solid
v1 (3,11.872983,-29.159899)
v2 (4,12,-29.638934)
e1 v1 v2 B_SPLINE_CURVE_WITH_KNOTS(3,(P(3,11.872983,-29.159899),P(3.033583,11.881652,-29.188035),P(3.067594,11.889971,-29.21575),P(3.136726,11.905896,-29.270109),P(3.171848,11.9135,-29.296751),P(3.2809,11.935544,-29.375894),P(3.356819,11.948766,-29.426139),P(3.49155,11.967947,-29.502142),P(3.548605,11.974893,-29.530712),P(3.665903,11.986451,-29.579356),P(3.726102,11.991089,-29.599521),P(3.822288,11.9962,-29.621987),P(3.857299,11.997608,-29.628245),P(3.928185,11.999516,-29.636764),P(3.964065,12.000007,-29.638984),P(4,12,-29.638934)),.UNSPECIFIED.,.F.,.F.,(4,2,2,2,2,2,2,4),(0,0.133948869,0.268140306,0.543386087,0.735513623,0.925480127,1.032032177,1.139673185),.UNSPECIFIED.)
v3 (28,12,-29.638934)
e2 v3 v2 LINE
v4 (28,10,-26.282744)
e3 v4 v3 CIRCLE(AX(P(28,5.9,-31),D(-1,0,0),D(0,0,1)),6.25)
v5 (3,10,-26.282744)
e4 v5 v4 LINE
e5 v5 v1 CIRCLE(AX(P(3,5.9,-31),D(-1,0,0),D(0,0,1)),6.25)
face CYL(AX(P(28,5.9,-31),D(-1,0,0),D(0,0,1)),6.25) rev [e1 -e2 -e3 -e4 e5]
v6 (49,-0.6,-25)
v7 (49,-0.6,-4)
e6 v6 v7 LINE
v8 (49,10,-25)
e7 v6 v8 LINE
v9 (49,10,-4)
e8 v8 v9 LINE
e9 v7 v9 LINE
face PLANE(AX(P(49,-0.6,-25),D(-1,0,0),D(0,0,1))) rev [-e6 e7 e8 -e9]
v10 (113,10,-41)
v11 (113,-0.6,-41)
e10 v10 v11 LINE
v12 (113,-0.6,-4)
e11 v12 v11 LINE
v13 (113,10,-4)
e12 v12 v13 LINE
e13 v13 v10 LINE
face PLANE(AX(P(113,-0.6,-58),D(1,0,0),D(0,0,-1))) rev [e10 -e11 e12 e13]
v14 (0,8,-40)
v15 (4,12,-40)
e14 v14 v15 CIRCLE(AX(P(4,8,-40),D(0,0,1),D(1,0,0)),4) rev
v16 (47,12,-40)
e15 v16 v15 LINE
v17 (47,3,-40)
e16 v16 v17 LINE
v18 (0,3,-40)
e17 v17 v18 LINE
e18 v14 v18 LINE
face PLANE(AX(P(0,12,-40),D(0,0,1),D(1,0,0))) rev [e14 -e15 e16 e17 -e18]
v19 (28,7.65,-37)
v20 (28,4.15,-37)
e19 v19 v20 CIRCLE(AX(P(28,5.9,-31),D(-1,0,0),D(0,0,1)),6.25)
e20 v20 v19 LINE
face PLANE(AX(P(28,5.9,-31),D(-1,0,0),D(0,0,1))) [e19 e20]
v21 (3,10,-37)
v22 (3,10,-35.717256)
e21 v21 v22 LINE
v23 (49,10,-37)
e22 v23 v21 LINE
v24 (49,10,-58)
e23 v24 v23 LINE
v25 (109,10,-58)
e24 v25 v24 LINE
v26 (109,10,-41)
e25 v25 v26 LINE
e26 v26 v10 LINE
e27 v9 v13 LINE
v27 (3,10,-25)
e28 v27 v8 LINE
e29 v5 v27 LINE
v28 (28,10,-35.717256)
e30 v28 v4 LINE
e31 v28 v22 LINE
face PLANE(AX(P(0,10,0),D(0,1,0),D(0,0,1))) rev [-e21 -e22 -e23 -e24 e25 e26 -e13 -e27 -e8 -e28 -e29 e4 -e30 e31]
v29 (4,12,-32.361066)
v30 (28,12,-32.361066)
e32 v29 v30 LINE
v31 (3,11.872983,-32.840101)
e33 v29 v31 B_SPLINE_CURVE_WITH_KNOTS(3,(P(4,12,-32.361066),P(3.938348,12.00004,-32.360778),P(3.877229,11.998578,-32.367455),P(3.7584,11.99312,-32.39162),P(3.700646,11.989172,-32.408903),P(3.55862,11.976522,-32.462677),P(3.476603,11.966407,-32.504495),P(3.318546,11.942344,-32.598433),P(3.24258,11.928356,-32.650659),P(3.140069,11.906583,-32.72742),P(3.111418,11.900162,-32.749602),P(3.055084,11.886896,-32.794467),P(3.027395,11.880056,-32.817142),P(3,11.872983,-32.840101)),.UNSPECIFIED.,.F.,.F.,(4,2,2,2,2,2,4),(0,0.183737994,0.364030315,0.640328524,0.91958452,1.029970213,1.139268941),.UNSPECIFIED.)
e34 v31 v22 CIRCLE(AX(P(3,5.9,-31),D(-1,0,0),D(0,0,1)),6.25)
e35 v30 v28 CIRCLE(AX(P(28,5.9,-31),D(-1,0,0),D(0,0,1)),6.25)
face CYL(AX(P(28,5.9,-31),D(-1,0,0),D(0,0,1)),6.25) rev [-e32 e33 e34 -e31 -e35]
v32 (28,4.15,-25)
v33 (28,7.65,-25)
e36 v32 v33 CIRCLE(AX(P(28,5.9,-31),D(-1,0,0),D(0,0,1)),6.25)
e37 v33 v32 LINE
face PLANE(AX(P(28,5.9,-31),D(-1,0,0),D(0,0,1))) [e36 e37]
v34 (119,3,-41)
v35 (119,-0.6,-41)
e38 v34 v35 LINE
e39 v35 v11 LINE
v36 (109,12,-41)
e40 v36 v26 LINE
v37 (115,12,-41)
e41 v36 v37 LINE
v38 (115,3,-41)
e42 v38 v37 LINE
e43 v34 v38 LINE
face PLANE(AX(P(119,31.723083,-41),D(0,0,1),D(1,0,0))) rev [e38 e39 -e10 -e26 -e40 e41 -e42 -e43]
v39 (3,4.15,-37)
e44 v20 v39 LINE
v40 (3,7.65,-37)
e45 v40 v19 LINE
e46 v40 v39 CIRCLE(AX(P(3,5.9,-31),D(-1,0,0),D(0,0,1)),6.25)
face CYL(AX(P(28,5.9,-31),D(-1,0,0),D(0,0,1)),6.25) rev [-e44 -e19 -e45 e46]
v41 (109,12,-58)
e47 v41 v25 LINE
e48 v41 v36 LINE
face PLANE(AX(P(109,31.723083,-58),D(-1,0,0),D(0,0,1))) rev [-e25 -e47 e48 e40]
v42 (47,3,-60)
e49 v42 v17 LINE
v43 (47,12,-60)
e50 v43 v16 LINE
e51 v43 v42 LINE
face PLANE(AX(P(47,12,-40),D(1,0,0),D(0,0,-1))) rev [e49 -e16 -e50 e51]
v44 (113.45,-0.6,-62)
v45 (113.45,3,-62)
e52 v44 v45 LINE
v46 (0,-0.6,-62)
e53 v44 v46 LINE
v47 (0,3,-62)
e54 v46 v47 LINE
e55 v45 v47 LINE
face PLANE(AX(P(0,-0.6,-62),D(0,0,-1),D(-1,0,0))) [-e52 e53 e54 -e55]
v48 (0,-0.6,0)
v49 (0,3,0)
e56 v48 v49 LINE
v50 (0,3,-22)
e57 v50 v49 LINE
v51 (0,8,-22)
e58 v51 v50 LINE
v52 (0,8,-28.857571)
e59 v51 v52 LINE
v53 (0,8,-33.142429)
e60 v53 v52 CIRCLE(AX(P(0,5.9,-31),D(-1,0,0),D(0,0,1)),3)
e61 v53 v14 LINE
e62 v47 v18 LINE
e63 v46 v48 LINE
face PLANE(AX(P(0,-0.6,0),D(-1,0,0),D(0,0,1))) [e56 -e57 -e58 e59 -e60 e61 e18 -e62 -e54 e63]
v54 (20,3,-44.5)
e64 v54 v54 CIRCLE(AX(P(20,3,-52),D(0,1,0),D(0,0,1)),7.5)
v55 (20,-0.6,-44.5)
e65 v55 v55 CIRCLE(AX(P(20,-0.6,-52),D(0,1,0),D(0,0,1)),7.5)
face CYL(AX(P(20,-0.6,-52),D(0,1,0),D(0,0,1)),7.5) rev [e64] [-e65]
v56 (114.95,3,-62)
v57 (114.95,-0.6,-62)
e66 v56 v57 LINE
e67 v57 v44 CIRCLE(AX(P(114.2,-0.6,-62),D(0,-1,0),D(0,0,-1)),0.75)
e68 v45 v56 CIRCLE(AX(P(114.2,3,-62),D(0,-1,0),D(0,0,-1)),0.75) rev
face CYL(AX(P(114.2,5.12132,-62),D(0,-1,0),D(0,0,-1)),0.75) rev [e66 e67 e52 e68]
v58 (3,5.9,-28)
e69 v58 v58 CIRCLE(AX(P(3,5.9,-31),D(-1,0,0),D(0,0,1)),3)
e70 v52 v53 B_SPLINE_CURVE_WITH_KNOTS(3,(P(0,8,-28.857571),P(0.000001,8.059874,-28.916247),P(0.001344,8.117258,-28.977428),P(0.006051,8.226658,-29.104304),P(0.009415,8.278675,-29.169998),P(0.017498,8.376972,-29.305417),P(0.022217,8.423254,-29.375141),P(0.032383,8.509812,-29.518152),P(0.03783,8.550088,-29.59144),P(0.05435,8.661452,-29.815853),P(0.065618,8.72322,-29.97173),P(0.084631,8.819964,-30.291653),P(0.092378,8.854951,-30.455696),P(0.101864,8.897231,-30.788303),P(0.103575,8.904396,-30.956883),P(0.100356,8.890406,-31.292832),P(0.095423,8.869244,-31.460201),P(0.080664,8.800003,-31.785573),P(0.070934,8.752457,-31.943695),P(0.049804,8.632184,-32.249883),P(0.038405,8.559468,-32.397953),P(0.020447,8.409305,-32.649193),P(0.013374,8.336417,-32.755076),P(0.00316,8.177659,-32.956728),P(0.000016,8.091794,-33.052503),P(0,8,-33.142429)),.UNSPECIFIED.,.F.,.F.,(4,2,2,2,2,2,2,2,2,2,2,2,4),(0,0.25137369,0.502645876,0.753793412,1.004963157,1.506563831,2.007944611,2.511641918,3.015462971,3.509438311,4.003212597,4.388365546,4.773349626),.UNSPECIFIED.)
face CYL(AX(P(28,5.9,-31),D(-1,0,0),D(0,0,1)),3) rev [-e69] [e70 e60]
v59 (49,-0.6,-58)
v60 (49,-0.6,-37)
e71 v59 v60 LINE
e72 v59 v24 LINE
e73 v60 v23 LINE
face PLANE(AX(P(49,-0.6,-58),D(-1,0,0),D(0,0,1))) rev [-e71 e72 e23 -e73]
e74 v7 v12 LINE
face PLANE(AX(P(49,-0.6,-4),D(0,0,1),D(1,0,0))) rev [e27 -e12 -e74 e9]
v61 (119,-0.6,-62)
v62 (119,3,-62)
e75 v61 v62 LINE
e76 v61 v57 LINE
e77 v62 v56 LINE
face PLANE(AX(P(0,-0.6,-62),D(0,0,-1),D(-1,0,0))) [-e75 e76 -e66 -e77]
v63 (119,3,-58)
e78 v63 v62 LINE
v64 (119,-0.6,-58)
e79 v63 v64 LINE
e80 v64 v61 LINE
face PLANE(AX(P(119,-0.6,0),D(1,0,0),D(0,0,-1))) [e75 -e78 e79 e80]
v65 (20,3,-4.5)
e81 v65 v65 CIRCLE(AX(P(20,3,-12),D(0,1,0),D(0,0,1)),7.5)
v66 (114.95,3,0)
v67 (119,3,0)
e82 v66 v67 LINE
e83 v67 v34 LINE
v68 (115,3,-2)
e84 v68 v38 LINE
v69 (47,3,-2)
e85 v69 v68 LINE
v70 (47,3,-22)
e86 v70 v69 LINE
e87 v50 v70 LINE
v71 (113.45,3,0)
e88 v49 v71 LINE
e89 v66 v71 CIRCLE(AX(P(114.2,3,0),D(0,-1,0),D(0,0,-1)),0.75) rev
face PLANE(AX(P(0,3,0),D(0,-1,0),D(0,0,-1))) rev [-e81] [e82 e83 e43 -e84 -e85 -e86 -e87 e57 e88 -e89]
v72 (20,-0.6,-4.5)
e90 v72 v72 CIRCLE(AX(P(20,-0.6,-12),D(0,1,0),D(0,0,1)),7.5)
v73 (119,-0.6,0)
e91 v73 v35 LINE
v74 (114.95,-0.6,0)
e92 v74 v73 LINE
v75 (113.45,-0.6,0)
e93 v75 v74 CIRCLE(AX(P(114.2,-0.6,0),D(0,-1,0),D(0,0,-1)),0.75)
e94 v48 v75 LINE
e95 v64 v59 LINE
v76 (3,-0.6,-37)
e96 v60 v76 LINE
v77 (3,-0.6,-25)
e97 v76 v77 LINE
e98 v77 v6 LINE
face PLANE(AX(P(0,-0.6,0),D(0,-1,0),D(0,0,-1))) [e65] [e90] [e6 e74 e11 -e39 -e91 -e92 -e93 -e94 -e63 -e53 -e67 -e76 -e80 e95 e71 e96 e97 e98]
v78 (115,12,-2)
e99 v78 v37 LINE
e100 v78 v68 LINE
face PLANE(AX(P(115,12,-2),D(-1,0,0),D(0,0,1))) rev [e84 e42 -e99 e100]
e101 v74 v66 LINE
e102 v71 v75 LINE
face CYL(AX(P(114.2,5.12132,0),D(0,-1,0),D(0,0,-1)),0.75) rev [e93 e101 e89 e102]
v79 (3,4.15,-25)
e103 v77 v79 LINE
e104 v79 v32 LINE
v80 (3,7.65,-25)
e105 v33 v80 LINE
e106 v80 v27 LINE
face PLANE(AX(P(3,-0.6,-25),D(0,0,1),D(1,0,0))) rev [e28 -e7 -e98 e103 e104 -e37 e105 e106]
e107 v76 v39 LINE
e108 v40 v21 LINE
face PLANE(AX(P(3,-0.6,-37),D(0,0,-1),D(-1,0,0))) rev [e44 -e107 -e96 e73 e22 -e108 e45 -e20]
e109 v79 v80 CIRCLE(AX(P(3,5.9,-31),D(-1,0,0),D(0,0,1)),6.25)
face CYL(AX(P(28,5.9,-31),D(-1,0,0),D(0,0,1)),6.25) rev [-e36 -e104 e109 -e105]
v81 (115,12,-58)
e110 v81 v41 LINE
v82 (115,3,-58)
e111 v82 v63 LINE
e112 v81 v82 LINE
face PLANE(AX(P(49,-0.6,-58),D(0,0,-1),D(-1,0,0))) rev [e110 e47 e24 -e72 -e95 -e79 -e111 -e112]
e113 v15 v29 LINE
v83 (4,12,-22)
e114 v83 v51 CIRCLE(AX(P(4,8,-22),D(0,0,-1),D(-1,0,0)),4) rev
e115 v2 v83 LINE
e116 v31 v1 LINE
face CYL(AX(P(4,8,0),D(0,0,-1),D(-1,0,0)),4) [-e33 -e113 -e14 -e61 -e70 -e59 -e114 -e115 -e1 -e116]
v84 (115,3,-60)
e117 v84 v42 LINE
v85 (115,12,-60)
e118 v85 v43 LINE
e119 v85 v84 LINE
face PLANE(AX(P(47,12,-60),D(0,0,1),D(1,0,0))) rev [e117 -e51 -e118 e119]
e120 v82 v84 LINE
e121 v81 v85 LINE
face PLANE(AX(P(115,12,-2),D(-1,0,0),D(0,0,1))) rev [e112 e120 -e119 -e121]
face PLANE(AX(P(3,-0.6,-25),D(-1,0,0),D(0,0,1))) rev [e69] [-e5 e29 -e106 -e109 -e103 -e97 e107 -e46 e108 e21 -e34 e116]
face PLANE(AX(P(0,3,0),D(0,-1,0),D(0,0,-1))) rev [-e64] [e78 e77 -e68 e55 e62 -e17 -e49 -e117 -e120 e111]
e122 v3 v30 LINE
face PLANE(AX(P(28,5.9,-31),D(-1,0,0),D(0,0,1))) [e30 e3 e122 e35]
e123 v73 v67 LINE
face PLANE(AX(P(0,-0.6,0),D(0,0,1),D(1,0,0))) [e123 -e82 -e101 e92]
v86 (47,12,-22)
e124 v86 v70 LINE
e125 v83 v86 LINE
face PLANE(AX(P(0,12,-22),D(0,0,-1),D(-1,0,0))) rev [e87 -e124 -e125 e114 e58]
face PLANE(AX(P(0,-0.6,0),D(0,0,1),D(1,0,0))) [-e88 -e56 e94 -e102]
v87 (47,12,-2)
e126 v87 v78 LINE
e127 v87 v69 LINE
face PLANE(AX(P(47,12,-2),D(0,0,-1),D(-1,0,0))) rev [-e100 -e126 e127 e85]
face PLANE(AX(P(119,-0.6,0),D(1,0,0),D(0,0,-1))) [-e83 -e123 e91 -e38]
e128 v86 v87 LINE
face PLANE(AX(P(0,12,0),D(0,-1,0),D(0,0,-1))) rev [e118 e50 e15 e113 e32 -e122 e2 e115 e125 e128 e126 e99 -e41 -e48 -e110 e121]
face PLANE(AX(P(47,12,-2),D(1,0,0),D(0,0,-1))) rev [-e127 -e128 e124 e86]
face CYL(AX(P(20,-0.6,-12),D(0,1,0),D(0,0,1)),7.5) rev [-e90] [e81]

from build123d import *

# Parameters (mm, degrees)
RESSALTO_EXTRUS_O1_DEPTH      = 3
RESSALTO_EXTRUS_O1_DEPTH_BACK = 0.6
ESBO_O1_W                     = 119
ESBO_O1_H                     = 62
ESBO_O1_R                     = 7.5
RESSALTO_EXTRUS_O2_DEPTH      = 9
CORTE_EXTRUS_O1_START         = -2
CORTE_EXTRUS_O1_DEPTH         = 133.772994327
ESBO_O4_R                     = 3
CORTE_EXTRUS_O2_DEPTH         = 28
CORTE_EXTRUS_O3_START         = -3
ESBO_O4_4_R                   = 6.25
ESBO_O4_4_R_2                 = 3
CORTE_EXTRUS_O3_DEPTH         = 25
ESBO_O6_R                     = 0.75
CORTE_EXTRUS_O5_DEPTH         = 3.6
CORTE_EXTRUS_O6_REACH         = 136.773
ESBO_O7_W                     = 10
ESBO_O7_H                     = 17
FILETE1_R                     = 4


with BuildPart() as part:
    # Esboço1 → Ressalto-extrusão1 (new, two sides: drawn at the far end of the back side and taken through both)
    with BuildSketch(Plane(origin=(0, 0, 0), x_dir=(1, 0, 0), z_dir=(0, 1, 0)).offset(-RESSALTO_EXTRUS_O1_DEPTH_BACK)):
        with Locations((59.5, 31)):
            Rectangle(ESBO_O1_W, ESBO_O1_H)
        with Locations(Location((20, 52, 0), (0, 0, 270))):
            Circle(ESBO_O1_R, mode=Mode.SUBTRACT)
        with Locations(Location((20, 12, 0), (0, 0, 270))):
            Circle(ESBO_O1_R, mode=Mode.SUBTRACT)
    extrude(amount=RESSALTO_EXTRUS_O1_DEPTH + RESSALTO_EXTRUS_O1_DEPTH_BACK)

    # Esboço2 → Ressalto-extrusão2 (add)
    with BuildSketch(Plane(origin=(0, 3, 0), x_dir=(1, 0, 0), z_dir=(0, 1, 0))):
        Polygon((47, 2), (115, 2), (115, 60), (47, 60), (47, 40), (0, 40), (0, 22), (47, 22), align=None)
    extrude(amount=RESSALTO_EXTRUS_O2_DEPTH)

    # Esboço3 → Corte-extrusão1 (cut, through all)
    with BuildSketch(Plane(origin=(0, 12, 0), x_dir=(1, 0, 0), z_dir=(0, 1, 0)).offset(CORTE_EXTRUS_O1_START)):
        Polygon((49, 58), (113, 58), (113, 4), (49, 4), (49, 25), (3, 25), (3, 37), (49, 37), align=None)
    extrude(amount=-CORTE_EXTRUS_O1_DEPTH, mode=Mode.SUBTRACT)

    # Esboço4 → Corte-extrusão2 (cut)
    with BuildSketch(Plane.ZY):
        with Locations((-31, 5.9)):
            Circle(ESBO_O4_R)
    extrude(amount=-CORTE_EXTRUS_O2_DEPTH, mode=Mode.SUBTRACT)

    # Esboço4<4> → Corte-extrusão3 (cut)
    with BuildSketch(Plane.ZY.offset(CORTE_EXTRUS_O3_START)):
        with Locations((-31, 5.9)):
            Circle(ESBO_O4_4_R)
        with Locations((-31, 5.9)):
            Circle(ESBO_O4_4_R_2, mode=Mode.SUBTRACT)
    extrude(amount=-CORTE_EXTRUS_O3_DEPTH, mode=Mode.SUBTRACT)

    # Esboço6 → Corte-extrusão5 (cut)
    with BuildSketch(Plane.XZ.offset(0.6)):
        with Locations((114.2, 0)):
            Circle(ESBO_O6_R)
        with Locations((114.2, -62)):
            Circle(ESBO_O6_R)
    extrude(amount=-CORTE_EXTRUS_O5_DEPTH, mode=Mode.SUBTRACT)

    # Corte-extrusão6: up to this face of the body (flat: up to its plane)
    corte_extrus_o6_end = Plane(part.part.faces().sort_by_distance((71.642099046, 12, -31))[0])
    # Esboço7 → Corte-extrusão6 (cut, up to the picked face)
    with BuildSketch(Plane(origin=(0, -0.6, 0), x_dir=(-1, 0, 0), z_dir=(0, -1, 0)), mode=Mode.PRIVATE) as corte_extrus_o6_sk1:
        with Locations((-114, 49.5)):
            Rectangle(ESBO_O7_W, ESBO_O7_H)
    corte_extrus_o6_tool1 = split(extrude(corte_extrus_o6_sk1.sketch, amount=-CORTE_EXTRUS_O6_REACH, mode=Mode.PRIVATE), bisect_by=corte_extrus_o6_end, keep=Keep.BOTH, mode=Mode.PRIVATE)
    add(corte_extrus_o6_tool1.solids().sort_by(Axis((114, -0.6, -49.5), (0, 1, 0)))[0], mode=Mode.SUBTRACT)

    # Filete1
    # the kernel refuses this fillet: 4 mm, written as the material it takes off along each edge
    with BuildSketch(Plane(origin=(0, 12, -50), x_dir=(1, 0, 0), z_dir=(0, 0, 1))) as filete1_piece_1:
        with BuildLine():
            CenterArc((FILETE1_R, -FILETE1_R), FILETE1_R, 90, 90)
            Line((0, -FILETE1_R), (0, 0))
            Line((0, 0), (FILETE1_R, 0))
        make_face()
    extrude(amount=38, mode=Mode.SUBTRACT)


solid = part.part
